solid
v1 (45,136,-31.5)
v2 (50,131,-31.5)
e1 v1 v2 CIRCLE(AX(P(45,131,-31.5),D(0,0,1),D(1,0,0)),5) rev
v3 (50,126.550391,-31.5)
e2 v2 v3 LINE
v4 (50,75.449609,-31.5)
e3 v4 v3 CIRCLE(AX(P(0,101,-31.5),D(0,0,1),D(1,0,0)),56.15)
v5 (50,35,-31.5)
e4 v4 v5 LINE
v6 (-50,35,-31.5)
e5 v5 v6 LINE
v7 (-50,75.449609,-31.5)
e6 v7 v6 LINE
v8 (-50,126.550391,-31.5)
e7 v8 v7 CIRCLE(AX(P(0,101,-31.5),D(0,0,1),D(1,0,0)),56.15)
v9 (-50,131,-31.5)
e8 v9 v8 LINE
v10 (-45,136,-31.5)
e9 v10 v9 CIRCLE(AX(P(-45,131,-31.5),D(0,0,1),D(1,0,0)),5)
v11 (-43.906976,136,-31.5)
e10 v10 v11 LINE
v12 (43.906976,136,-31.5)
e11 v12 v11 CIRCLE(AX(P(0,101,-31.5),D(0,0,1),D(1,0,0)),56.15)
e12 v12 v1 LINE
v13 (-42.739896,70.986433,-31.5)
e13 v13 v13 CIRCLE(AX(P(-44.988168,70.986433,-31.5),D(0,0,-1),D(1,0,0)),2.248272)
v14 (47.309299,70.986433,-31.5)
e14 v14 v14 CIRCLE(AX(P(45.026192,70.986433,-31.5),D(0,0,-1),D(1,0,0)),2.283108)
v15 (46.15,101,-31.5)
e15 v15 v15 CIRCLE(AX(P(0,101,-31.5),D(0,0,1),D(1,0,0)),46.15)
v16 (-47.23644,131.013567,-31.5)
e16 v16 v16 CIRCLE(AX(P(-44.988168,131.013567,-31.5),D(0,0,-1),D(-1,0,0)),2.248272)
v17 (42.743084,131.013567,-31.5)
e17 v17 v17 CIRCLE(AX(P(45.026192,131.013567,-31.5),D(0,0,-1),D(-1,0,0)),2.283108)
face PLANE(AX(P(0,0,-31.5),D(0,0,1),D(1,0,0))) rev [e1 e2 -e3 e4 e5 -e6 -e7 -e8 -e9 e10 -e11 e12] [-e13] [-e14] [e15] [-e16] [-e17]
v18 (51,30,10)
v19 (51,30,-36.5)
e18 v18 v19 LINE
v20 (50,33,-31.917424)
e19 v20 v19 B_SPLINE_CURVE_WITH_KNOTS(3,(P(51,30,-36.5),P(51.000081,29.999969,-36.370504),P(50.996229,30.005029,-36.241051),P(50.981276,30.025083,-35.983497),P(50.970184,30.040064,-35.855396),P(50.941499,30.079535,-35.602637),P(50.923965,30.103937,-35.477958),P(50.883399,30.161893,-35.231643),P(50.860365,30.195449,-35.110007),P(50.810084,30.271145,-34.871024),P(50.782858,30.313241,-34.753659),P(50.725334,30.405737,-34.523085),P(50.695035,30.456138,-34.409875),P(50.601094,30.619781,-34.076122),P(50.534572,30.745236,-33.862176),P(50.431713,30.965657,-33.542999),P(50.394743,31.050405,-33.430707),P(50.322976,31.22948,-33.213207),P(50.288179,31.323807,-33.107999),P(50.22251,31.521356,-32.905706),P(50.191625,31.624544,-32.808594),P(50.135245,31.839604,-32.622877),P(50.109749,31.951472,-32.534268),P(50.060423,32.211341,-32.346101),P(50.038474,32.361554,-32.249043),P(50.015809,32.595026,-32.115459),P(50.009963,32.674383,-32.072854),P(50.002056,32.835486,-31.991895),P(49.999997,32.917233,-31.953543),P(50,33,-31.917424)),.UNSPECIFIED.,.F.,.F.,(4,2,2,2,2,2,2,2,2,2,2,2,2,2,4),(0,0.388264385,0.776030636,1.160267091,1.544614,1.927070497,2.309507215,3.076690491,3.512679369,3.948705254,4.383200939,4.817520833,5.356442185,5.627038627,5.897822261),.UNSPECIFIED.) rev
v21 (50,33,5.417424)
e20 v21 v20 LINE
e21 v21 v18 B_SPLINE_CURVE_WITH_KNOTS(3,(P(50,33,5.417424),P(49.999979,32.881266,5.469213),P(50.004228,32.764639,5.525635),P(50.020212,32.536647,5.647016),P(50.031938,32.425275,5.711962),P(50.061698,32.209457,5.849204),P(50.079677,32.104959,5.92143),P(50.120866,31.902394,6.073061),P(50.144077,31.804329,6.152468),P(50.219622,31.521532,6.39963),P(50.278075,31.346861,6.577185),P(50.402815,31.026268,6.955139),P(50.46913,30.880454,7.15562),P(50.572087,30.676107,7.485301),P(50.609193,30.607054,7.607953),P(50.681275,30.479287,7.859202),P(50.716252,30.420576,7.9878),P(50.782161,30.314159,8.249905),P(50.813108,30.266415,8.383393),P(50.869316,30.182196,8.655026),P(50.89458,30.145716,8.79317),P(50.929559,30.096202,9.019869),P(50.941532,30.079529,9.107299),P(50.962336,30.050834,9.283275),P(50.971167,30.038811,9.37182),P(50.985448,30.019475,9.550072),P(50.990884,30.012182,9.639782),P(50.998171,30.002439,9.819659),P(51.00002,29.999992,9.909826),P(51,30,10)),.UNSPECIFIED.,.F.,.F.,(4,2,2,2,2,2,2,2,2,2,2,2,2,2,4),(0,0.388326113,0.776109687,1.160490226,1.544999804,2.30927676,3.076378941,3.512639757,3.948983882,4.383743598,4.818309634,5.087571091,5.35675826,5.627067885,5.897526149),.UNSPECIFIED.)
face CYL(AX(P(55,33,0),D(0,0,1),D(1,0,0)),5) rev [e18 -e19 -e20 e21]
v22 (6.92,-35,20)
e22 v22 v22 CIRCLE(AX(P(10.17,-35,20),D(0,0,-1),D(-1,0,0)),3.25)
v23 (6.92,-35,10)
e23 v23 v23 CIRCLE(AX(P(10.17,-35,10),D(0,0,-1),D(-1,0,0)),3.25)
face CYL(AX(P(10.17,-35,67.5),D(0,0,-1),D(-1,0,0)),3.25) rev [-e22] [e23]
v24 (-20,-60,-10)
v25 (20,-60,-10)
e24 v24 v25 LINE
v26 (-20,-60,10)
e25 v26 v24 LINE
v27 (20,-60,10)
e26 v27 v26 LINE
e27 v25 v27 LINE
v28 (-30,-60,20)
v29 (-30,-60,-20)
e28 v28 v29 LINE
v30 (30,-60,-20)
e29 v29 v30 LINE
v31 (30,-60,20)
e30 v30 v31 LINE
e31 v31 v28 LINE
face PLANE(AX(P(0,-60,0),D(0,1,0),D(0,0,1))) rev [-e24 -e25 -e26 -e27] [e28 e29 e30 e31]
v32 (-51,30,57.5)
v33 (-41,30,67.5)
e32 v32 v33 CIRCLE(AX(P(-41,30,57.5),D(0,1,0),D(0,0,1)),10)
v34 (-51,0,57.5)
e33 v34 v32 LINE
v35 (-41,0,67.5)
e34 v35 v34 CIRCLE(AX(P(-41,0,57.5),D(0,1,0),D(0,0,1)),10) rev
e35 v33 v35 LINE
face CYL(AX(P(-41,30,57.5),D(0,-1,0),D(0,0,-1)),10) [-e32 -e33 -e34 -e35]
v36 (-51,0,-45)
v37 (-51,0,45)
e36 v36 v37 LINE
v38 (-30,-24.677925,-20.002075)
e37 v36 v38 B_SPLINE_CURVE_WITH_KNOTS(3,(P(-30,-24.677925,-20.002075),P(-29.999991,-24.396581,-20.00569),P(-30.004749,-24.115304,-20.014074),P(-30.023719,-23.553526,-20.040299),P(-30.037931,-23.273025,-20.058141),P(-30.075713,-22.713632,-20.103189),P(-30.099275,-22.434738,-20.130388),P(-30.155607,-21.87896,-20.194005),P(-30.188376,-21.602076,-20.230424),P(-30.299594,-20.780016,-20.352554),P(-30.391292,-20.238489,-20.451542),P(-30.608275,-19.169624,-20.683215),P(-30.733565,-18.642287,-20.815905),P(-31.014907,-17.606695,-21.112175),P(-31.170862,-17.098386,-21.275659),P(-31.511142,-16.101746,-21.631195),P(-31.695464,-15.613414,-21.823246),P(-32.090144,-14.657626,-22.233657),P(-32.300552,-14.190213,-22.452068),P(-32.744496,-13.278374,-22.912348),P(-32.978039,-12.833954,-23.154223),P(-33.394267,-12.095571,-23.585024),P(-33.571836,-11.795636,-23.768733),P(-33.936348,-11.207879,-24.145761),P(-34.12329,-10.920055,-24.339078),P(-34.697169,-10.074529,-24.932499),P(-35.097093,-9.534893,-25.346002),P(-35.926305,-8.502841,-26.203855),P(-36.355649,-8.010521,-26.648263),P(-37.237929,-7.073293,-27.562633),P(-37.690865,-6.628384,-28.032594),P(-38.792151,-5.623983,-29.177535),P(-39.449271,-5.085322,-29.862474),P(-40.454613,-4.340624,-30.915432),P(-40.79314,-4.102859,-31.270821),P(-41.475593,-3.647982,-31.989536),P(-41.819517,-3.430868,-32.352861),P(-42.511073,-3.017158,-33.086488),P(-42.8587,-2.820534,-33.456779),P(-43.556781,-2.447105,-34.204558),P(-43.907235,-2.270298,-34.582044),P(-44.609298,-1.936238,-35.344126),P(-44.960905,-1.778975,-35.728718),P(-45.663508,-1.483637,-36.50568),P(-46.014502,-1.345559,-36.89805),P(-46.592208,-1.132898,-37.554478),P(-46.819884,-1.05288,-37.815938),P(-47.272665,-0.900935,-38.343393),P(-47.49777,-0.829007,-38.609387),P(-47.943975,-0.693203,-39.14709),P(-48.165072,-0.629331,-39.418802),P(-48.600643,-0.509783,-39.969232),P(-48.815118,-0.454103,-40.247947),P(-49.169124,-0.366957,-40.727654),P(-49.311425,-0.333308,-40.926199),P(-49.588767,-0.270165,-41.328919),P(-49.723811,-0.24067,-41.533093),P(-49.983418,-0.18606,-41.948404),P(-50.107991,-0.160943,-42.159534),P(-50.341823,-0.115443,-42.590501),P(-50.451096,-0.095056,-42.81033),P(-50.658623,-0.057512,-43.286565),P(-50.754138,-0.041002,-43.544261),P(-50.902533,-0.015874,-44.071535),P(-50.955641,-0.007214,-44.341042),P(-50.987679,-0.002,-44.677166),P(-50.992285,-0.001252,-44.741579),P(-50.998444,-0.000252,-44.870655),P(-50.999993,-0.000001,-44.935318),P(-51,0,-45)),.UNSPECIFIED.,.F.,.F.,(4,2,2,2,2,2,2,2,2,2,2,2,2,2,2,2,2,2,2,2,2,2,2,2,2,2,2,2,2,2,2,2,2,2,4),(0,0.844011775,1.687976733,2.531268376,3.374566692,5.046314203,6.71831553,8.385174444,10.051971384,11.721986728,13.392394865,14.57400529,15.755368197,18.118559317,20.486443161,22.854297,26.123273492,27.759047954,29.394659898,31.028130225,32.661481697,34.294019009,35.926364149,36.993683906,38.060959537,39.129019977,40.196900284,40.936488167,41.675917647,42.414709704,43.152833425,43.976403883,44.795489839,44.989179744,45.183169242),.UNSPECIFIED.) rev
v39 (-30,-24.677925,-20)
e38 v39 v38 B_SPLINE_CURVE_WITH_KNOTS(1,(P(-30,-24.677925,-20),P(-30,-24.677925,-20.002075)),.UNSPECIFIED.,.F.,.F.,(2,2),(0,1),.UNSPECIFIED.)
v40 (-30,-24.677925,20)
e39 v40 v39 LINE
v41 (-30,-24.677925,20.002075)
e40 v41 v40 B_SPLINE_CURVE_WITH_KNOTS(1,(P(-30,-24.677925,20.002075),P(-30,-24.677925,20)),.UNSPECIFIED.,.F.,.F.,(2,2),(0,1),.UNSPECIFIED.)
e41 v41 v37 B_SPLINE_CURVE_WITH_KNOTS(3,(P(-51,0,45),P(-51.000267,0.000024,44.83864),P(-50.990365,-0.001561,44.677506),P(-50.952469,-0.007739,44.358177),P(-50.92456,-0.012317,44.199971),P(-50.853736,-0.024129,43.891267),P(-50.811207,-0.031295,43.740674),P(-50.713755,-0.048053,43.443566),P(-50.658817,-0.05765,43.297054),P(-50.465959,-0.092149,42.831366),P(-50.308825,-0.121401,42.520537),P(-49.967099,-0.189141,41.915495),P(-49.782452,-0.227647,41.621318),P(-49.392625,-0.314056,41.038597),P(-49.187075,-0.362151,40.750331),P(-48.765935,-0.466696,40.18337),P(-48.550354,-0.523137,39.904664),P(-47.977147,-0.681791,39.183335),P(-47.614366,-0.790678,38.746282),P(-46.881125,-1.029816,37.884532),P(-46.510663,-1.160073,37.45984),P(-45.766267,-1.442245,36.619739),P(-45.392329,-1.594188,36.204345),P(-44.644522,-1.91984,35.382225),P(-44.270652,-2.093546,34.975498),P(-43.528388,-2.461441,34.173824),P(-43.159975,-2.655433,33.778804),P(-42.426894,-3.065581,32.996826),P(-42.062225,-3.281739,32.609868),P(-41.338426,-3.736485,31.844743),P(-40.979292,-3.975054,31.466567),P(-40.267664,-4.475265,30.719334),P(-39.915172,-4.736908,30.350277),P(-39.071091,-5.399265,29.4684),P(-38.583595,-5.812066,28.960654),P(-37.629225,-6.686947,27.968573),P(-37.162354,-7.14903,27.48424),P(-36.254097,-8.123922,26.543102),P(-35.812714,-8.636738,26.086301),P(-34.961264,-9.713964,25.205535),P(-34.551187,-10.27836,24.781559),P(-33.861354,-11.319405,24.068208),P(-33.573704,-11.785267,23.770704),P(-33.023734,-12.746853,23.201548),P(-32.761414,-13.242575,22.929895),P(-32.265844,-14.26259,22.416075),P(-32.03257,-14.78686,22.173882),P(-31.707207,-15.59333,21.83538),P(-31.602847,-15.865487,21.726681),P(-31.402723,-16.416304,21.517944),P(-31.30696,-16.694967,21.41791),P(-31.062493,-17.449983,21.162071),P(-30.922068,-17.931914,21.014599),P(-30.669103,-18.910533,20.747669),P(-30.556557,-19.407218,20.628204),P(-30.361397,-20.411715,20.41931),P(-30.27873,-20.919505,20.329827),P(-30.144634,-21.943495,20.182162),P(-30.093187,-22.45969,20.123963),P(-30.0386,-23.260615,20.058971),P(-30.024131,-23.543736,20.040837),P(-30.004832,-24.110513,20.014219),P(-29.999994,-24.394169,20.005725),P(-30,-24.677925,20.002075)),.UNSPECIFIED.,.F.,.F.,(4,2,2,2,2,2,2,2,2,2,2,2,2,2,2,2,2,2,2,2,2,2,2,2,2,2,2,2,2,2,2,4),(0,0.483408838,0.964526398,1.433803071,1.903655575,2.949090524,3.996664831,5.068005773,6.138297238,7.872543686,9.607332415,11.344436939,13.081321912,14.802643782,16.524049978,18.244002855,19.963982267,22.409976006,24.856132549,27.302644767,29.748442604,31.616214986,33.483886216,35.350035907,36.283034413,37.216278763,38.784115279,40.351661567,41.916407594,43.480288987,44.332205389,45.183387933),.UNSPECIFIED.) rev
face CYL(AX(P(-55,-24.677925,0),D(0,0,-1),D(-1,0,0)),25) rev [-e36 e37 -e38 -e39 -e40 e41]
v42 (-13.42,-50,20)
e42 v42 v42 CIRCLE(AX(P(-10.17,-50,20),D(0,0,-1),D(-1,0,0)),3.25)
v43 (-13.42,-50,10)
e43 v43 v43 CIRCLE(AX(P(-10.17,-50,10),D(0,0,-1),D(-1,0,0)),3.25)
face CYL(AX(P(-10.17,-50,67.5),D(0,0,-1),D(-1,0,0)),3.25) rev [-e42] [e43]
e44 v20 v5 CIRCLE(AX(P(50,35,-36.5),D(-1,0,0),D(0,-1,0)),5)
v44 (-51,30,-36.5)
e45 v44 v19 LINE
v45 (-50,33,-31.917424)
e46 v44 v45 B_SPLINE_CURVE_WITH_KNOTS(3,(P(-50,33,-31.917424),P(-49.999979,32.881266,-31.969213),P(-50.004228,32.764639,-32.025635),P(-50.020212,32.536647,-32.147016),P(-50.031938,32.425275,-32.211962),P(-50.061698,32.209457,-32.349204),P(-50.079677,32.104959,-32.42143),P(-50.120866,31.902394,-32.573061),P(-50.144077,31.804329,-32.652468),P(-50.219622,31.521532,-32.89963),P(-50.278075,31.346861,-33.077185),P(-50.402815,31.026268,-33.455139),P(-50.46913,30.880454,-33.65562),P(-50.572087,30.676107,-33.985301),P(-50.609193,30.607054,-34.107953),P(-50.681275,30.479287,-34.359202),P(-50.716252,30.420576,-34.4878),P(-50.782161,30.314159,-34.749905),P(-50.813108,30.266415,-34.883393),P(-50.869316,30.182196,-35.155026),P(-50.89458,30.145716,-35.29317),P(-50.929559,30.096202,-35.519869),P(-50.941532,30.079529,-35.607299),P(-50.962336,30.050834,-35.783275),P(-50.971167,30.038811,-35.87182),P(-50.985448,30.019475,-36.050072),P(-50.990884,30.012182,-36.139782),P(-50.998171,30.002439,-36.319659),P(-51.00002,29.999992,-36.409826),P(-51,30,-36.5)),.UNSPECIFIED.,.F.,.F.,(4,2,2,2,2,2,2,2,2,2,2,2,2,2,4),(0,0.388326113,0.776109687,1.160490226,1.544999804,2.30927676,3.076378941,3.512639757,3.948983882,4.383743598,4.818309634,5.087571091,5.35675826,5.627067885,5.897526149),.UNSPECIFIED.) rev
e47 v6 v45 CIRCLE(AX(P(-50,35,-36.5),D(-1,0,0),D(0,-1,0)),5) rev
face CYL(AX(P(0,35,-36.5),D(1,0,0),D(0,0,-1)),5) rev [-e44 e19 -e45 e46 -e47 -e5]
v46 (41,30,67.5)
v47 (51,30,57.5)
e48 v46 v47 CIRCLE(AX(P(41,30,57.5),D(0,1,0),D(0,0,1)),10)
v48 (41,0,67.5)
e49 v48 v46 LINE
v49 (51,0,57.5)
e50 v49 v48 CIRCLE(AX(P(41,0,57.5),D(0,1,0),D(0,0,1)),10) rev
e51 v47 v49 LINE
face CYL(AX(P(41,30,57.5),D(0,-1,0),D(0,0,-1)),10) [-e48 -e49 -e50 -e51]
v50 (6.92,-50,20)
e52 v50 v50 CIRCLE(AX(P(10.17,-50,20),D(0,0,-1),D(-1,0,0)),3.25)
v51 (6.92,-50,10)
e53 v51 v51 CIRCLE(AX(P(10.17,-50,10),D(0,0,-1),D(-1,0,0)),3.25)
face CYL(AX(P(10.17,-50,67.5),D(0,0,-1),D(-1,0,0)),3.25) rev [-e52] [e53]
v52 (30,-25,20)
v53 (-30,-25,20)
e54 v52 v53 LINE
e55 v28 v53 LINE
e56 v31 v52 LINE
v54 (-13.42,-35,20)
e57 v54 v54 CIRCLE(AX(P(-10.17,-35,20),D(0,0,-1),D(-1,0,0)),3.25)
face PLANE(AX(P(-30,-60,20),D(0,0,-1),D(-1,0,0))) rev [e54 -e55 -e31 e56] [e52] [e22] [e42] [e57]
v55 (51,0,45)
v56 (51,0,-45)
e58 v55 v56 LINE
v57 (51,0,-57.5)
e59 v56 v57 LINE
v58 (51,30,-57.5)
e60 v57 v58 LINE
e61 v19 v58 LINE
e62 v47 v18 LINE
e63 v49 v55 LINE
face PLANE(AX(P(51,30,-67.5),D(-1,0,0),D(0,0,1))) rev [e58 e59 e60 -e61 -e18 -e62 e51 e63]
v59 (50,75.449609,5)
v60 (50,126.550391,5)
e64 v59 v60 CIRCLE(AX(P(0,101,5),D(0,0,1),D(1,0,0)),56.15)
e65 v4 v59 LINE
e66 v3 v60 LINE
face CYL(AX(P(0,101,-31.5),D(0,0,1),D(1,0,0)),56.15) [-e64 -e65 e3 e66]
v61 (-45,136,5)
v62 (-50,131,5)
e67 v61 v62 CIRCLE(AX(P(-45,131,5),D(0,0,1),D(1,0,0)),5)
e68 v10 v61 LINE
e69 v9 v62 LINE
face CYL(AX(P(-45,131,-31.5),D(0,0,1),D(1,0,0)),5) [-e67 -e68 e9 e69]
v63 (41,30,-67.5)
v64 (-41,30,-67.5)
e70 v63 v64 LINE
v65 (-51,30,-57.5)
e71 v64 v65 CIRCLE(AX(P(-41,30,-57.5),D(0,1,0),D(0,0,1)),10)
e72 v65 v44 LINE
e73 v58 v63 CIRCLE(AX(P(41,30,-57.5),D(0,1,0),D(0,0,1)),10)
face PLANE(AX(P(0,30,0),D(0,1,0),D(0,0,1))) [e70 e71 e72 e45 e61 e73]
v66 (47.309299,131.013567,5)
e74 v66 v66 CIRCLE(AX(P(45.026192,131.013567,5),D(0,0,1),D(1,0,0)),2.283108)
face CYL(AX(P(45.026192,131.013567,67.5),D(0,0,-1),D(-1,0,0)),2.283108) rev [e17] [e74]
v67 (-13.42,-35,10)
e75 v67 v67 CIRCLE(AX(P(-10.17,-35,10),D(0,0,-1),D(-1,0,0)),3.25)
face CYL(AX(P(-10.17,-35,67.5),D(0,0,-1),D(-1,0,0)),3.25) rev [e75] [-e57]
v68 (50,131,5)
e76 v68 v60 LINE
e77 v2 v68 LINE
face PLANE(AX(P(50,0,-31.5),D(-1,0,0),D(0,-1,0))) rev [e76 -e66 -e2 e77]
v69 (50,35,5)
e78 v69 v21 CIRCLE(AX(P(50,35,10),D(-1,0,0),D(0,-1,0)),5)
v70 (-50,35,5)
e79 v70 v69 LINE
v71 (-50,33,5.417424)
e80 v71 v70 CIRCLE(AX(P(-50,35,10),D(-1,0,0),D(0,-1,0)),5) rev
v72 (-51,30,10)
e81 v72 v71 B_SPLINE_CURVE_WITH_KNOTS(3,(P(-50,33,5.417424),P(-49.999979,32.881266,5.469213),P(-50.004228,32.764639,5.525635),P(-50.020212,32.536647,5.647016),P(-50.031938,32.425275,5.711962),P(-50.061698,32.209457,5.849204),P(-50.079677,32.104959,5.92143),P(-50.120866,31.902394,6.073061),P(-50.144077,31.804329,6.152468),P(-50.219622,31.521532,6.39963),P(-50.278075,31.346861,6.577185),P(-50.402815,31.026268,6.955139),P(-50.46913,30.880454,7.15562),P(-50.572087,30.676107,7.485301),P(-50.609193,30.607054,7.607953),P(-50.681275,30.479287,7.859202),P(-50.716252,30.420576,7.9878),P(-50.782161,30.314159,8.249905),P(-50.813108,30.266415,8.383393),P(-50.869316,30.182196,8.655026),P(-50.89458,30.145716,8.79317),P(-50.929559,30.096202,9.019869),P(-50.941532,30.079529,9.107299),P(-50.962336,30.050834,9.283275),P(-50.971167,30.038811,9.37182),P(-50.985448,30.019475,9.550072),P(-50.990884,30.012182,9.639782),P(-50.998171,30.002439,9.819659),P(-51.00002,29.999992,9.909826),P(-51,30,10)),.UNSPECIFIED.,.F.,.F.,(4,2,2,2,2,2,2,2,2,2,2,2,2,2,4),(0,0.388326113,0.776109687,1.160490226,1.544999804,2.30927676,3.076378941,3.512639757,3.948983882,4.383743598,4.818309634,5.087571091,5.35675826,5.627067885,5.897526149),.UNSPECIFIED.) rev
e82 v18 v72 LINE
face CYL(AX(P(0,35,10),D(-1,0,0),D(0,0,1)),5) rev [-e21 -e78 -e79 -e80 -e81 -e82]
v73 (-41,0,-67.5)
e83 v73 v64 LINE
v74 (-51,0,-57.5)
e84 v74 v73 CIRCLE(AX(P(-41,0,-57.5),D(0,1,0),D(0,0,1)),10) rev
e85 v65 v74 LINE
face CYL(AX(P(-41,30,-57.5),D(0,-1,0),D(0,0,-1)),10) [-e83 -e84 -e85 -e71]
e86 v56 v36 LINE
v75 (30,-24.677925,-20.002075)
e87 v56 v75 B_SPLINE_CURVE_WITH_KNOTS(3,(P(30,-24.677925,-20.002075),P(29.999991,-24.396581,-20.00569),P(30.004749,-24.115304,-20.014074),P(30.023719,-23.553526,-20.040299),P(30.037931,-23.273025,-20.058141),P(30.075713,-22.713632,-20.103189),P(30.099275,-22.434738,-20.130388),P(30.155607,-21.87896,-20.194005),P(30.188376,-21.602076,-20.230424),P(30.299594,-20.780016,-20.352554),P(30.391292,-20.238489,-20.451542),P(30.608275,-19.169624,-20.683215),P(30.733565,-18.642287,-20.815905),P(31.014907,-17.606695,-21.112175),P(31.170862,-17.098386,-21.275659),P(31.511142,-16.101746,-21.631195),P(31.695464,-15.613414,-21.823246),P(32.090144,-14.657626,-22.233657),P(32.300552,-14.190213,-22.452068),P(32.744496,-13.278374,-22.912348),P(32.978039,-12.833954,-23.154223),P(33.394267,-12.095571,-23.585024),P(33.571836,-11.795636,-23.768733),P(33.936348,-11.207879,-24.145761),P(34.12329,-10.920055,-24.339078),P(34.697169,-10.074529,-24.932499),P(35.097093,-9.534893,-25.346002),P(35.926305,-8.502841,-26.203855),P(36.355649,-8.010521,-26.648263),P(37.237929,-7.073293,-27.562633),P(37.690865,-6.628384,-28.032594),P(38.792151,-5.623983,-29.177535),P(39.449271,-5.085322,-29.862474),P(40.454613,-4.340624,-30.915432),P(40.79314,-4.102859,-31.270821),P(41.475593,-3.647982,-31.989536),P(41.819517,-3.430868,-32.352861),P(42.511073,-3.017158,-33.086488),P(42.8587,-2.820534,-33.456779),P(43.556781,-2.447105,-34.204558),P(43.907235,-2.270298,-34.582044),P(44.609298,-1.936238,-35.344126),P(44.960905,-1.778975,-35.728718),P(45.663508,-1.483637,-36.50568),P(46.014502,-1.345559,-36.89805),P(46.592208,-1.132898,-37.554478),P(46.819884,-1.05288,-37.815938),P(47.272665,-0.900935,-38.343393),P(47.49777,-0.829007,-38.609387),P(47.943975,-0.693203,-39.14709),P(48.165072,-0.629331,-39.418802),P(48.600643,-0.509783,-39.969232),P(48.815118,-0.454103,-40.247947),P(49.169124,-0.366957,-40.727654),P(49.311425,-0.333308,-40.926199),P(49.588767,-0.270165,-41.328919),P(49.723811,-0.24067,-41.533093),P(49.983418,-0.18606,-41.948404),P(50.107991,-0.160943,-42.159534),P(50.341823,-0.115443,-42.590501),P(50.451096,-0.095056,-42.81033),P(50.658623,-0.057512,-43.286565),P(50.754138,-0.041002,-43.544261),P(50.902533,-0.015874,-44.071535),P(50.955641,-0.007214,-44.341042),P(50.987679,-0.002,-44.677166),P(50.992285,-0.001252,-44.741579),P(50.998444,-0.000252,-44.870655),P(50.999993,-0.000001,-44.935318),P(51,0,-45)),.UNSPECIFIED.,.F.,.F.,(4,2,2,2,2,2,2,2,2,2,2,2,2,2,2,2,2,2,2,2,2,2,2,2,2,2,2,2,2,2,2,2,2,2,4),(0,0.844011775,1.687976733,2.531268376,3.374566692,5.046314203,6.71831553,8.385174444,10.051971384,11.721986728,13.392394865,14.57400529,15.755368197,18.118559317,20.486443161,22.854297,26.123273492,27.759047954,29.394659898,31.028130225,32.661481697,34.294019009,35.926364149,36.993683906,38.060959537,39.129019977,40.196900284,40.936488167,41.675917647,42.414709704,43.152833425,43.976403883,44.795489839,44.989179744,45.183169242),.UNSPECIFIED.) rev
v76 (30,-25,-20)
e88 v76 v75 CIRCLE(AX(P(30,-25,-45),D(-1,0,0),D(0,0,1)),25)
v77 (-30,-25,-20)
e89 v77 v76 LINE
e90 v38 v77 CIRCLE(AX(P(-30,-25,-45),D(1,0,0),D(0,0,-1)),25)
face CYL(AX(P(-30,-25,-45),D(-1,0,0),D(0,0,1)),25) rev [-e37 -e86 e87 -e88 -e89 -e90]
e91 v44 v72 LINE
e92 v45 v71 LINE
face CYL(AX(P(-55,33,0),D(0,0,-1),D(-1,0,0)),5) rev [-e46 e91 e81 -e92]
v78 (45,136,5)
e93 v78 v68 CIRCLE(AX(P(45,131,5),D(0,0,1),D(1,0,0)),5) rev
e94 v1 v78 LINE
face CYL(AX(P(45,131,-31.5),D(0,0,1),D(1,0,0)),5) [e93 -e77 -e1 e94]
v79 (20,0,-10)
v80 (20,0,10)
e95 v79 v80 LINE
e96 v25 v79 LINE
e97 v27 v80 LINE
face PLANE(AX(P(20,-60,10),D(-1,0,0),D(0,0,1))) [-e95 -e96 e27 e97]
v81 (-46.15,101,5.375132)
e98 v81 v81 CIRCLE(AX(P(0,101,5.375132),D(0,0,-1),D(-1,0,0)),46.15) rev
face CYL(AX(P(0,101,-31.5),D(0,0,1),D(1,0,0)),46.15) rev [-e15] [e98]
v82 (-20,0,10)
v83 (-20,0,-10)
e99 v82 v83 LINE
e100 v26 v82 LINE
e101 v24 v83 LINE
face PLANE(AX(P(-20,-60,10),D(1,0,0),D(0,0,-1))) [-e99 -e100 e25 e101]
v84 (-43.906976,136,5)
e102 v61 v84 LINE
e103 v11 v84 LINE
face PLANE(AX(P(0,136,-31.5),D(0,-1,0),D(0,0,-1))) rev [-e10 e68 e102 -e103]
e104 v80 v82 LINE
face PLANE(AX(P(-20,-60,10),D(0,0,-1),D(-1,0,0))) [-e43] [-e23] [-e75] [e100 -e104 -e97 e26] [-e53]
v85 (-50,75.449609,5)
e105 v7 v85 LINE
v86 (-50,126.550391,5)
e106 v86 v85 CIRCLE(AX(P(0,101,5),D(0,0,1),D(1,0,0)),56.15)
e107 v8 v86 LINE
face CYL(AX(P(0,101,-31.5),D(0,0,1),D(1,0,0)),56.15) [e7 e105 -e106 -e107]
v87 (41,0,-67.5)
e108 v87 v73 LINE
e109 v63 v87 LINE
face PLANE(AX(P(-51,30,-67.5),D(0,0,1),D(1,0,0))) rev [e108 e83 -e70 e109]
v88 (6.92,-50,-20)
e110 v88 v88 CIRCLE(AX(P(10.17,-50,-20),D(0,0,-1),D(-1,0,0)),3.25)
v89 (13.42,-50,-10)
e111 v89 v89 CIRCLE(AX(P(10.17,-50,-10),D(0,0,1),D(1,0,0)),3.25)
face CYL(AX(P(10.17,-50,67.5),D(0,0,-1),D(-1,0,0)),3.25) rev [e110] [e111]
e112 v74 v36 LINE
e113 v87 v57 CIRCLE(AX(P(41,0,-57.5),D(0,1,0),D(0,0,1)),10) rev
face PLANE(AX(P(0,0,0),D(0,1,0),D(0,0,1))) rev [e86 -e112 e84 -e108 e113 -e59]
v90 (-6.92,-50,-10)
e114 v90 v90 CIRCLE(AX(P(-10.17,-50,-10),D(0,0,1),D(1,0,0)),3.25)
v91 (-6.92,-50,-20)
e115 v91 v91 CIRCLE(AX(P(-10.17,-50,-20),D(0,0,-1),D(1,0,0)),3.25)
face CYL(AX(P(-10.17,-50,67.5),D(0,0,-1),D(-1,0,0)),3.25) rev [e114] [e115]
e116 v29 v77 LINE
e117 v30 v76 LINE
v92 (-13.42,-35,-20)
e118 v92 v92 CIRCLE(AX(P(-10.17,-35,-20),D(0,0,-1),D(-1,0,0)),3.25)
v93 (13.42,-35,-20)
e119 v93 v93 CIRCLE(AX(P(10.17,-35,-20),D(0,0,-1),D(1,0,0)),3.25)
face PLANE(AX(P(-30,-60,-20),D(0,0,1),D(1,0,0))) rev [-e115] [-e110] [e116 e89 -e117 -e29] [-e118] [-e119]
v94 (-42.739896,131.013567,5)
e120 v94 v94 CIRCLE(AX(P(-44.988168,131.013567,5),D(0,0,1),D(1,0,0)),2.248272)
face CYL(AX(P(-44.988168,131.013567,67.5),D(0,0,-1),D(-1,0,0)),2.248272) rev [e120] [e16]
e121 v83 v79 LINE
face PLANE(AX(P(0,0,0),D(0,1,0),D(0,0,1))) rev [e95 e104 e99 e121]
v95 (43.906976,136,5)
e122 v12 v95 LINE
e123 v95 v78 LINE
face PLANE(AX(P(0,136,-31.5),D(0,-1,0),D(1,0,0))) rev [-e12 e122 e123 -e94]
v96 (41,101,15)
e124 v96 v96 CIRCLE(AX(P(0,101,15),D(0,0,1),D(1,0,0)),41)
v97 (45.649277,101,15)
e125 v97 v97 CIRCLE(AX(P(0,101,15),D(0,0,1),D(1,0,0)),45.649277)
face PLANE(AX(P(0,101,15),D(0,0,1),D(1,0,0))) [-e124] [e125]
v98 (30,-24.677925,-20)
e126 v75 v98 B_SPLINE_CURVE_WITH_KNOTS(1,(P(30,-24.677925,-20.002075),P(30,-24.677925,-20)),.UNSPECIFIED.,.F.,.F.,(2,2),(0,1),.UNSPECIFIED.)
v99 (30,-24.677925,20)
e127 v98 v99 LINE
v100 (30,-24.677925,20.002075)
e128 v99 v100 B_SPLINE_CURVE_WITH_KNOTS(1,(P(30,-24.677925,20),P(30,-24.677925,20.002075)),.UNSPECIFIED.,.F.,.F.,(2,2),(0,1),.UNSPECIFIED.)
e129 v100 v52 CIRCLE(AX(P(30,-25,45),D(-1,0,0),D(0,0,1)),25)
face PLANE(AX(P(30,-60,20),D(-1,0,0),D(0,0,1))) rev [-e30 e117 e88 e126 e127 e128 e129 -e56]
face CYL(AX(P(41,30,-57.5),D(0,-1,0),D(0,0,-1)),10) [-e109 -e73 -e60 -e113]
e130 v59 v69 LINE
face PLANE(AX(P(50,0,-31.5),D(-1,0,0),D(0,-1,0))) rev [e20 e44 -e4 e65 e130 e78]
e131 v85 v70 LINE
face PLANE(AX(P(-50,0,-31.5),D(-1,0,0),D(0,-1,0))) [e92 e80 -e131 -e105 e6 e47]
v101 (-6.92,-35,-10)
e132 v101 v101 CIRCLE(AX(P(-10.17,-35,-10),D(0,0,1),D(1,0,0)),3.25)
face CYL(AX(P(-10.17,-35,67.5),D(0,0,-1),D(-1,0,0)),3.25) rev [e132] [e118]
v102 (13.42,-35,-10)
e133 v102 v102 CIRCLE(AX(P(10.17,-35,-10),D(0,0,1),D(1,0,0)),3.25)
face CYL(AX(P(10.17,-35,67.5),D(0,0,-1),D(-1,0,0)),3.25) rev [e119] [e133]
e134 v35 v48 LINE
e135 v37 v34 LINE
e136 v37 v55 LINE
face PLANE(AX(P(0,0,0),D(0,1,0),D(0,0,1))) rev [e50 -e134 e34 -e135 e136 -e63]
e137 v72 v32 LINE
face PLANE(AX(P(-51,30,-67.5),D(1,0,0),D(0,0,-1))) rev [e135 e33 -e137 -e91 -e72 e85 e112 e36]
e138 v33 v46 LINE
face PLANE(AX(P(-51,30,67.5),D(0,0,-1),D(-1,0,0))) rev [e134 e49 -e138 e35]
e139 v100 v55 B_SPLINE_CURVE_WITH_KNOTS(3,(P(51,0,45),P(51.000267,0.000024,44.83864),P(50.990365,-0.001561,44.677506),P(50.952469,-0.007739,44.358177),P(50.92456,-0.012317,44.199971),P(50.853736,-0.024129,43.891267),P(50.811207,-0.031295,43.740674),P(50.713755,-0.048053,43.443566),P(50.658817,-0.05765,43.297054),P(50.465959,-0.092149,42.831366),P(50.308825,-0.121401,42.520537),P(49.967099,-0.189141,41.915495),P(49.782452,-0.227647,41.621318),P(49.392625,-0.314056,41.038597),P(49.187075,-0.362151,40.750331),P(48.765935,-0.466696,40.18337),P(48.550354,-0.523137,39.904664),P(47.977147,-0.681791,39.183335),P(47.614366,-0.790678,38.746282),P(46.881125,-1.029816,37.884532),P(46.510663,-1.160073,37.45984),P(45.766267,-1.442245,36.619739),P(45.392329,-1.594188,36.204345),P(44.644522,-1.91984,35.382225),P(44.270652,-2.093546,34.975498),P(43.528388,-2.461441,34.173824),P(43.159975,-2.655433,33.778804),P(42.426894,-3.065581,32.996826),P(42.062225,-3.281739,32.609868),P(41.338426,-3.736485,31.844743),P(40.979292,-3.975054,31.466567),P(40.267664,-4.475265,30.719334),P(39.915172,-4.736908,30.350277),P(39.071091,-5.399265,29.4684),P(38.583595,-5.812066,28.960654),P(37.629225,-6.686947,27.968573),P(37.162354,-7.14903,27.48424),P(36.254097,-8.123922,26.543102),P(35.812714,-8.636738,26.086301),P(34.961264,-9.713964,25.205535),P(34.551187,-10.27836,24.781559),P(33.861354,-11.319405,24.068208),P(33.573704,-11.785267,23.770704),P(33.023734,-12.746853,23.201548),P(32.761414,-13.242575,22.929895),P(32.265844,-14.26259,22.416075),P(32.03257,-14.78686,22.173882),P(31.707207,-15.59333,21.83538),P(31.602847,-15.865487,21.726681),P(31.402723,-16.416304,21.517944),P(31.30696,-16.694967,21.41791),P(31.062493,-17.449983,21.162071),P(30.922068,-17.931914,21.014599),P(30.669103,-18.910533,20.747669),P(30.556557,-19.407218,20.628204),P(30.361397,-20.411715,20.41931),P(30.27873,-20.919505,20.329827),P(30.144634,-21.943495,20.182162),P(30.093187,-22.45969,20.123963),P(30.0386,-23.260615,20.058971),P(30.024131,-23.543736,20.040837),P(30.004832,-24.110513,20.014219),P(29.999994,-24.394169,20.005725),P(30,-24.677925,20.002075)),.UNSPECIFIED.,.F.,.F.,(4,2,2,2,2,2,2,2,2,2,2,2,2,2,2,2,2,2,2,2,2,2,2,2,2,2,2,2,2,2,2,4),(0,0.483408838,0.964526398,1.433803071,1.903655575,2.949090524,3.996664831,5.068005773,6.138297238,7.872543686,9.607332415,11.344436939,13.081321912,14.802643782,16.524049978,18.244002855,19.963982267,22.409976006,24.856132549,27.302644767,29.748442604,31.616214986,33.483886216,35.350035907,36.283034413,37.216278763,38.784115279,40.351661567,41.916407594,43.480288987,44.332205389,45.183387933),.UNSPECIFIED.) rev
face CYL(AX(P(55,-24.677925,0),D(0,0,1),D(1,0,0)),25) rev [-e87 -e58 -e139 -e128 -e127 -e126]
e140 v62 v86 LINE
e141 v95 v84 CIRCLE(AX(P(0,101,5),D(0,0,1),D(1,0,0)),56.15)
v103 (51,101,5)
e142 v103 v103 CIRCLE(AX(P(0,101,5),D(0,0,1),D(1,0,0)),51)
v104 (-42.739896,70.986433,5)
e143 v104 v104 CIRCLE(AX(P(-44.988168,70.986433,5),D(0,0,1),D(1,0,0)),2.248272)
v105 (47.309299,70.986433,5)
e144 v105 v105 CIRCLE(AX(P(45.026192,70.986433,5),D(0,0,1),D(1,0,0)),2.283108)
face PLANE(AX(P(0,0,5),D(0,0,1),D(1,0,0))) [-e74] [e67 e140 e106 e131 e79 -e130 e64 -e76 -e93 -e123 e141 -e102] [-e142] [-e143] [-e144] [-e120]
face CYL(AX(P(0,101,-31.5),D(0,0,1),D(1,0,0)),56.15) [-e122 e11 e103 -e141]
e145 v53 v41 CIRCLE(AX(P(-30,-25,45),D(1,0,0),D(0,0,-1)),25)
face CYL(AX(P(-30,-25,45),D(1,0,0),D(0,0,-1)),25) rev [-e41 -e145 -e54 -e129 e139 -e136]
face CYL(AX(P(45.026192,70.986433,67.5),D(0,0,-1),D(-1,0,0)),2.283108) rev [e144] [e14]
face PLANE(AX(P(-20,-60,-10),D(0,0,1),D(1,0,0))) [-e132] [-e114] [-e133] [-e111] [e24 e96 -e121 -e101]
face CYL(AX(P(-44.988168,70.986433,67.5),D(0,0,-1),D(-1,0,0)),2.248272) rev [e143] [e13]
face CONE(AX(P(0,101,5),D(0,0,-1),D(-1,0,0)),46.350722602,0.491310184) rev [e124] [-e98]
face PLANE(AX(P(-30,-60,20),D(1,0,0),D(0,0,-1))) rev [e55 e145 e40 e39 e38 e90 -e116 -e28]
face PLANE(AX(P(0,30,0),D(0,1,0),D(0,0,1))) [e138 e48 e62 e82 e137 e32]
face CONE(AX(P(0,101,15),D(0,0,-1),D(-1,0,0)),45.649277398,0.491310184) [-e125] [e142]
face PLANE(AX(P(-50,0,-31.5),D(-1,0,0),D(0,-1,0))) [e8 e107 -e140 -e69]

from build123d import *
from OCP.BRepAlgoAPI import BRepAlgoAPI_Cut
from OCP.TopTools import TopTools_ListOfShape

# Parameters (mm, degrees)
CROQUIS1_W              = 102
CROQUIS1_H              = 135
SALIENTE_EXTRUIR1_DEPTH = 30
SALIENTE_EXTRUIR2_START = 5
CROQUIS3_R              = 46.15
SALIENTE_EXTRUIR2_DEPTH = 36.5
CROQUIS5_R              = 51
CROQUIS5_R_2            = 41
SALIENTE_EXTRUIR3_DEPTH = 10
CHAFL_N1_SIZE           = 5.350722602
CHAFL_N1_SIZE_2         = 10
CHAFL_N2_SIZE2          = 5.350722602
CHAFL_N2_SIZE           = 10
REDONDEO1_R             = 5
CROQUIS7_R              = 2.248271999
CROQUIS7_R_2            = 2.283107554
CORTAR_EXTRUIR2_DEPTH   = 195.035937393
REDONDEO2_R             = 10
CROQUIS8_W              = 60
CROQUIS8_H              = 40
CROQUIS8_W_2            = 40
CROQUIS8_H_2            = 20
SALIENTE_EXTRUIR4_DEPTH = 60
REDONDEO3_START         = -20
REDONDEO3_DEPTH         = 40
REDONDEO3_START_2       = -51.000005347
REDONDEO3_2_DEPTH       = 102.000005347
REDONDEO3_START_3       = -57.5
REDONDEO3_3_DEPTH       = 115
CROQUIS9_R              = 3.25
CORTAR_EXTRUIR3_DEPTH   = 189.428222408


with BuildPart() as part:
    # Croquis1 → Saliente-Extruir1 (new body)
    with BuildSketch(Plane(origin=(0, 0, 0), x_dir=(1, 0, 0), z_dir=(0, 1, 0))):
        Rectangle(CROQUIS1_W, CROQUIS1_H)
    extrude(amount=SALIENTE_EXTRUIR1_DEPTH)

    # Croquis3 → Saliente-Extruir2 (add)
    with BuildSketch(Plane.XY.offset(SALIENTE_EXTRUIR2_START)):
        with BuildLine():
            Line((45, 136), (43.906975528, 136))
            ThreePointArc((43.906975528, 136), (0, 157.15), (-43.906975528, 136))
            Line((-43.906975528, 136), (-45, 136))
            ThreePointArc((-45, 136), (-48.535533906, 134.535533906), (-50, 131))
            Line((-50, 131), (-50, 126.550391386))
            ThreePointArc((-50, 126.550391386), (-56.15, 101), (-50, 75.449608614))
            Line((-50, 75.449608614), (-50, 30))
            Line((-50, 30), (50, 30))
            Line((50, 30), (50, 75.449608614))
            ThreePointArc((50, 75.449608614), (56.15, 101), (50, 126.550391386))
            Line((50, 126.550391386), (50, 131))
            ThreePointArc((50, 131), (48.535533906, 134.535533906), (45, 136))
        make_face()
        with Locations((0, 101)):
            Circle(CROQUIS3_R, mode=Mode.SUBTRACT)
    extrude(amount=-SALIENTE_EXTRUIR2_DEPTH)

    # Croquis5 → Saliente-Extruir3 (add)
    with BuildSketch(Plane.XY.offset(5)):
        with Locations((0, 101)):
            Circle(CROQUIS5_R)
        with Locations((0, 101)):
            Circle(CROQUIS5_R_2, mode=Mode.SUBTRACT)
    extrude(amount=SALIENTE_EXTRUIR3_DEPTH)

    # Chaflán1
    # the kernel refuses this chamfer: 10, 5.350722602 mm, written as the material it takes off along each edge
    with BuildSketch(Plane(origin=(0, 101, 5), x_dir=(1, 0, 0), z_dir=(0, -1, 0))) as chafl_n1_piece_1_section:
        Polygon((41 + CHAFL_N1_SIZE, 0), (41, CHAFL_N1_SIZE_2), (41, 0), align=None)
    chafl_n1_piece_1 = revolve(axis=Axis((0, 101, 5), (0, 0, 1)), mode=Mode.PRIVATE)
    chafl_n1_piece_1 = chafl_n1_piece_1 & Plane(origin=(0, 101, 5), x_dir=(1, 0, 0), z_dir=(0, 0, 1)) * Cylinder(46.15, 186, mode=Mode.PRIVATE)
    add(chafl_n1_piece_1, mode=Mode.SUBTRACT)

    # Chaflán2
    chafl_n2_edges = [part.edges().sort_by_distance(p)[0] for p in [
        (-51, 101, 15),
    ]]
    chafl_n2_side = [part.faces().sort_by_distance(p)[0] for p in [
        (-51, 101, 14.892985548),
    ]]
    chamfer(chafl_n2_edges, length=CHAFL_N2_SIZE - 0.0001, length2=CHAFL_N2_SIZE2 - 0.0001, reference=chafl_n2_side[0])  # a hair under: the kernel refuses the full size

    # Redondeo1
    # the kernel refuses this fillet: 5 mm, written as the material it adds along each edge
    with BuildSketch(Plane(origin=(-50, 30, -31.5), x_dir=(0, 0, -1), z_dir=(1, 0, 0)), Plane(origin=(-50, 30, 5), x_dir=(0, 1, 0), z_dir=(1, 0, 0))) as redondeo1_piece_1:
        with BuildLine():
            CenterArc((REDONDEO1_R, REDONDEO1_R), REDONDEO1_R, 180, 90)
            Line((0, REDONDEO1_R), (-REDONDEO1_R * 0.02, REDONDEO1_R))
            Line((-REDONDEO1_R * 0.02, REDONDEO1_R), (-REDONDEO1_R * 0.02, -REDONDEO1_R * 0.02))
            Line((-REDONDEO1_R * 0.02, -REDONDEO1_R * 0.02), (REDONDEO1_R, -REDONDEO1_R * 0.02))
            Line((REDONDEO1_R, -REDONDEO1_R * 0.02), (REDONDEO1_R, 0))
        make_face()
    extrude(amount=100)
    with BuildSketch(Plane(origin=(50, 30, 5), x_dir=(0, 1, 0), z_dir=(0, 0, -1))) as redondeo1_piece_2:
        with BuildLine():
            CenterArc((3, 5), REDONDEO1_R, 233.130102354, 36.869897646)
            Line((0, 1), (-0.06, 0.92))
            ThreePointArc((-0.06, 0.92), (-0.1, 0.5), (-0.1, 0))
            Line((-0.1, 0), (0, -0.1))
            Line((0, -0.1), (3, -0.1))
            Line((3, -0.1), (3, 0))
        make_face()
    extrude(amount=36.5)
    with BuildSketch(Plane(origin=(-50, 30, 5), x_dir=(-1, 0, 0), z_dir=(0, 0, -1))) as redondeo1_piece_3:
        with BuildLine():
            CenterArc((5, 3), REDONDEO1_R, 180, 36.869897646)
            Line((0, 3), (-0.1, 3))
            Line((-0.1, 3), (-0.1, 0))
            Line((-0.1, 0), (0, -0.1))
            ThreePointArc((0, -0.1), (0.5, -0.1), (0.92, -0.06))
            Line((0.92, -0.06), (1, 0))
        make_face()
    extrude(amount=36.5)
    with BuildSketch(Plane(origin=(-50, 30, 5), x_dir=(-1, 0, 0), z_dir=(0, 0, -1))) as redondeo1_piece_4a_section:
        with BuildLine():
            CenterArc((5, 3), REDONDEO1_R, 180, 36.869897646)
            Line((0, 3), (-0.1, 3))
            Line((-0.1, 3), (-0.1, 0))
            Line((-0.1, 0), (0, -0.1))
            ThreePointArc((0, -0.1), (0.5, -0.1), (0.92, -0.06))
            Line((0.92, -0.06), (1, 0))
        make_face()
    redondeo1_piece_4a = extrude(amount=44, mode=Mode.PRIVATE)
    redondeo1_piece_4a = split(redondeo1_piece_4a, bisect_by=Plane(origin=(-50, 30, -31.5), z_dir=(0, 0, -1)), keep=Keep.TOP, mode=Mode.PRIVATE)
    with BuildSketch(Plane(origin=(-62.5, 30, -31.5), x_dir=(0, 0, -1), z_dir=(1, 0, 0))) as redondeo1_piece_4b_section:
        with BuildLine():
            CenterArc((REDONDEO1_R, REDONDEO1_R), REDONDEO1_R, 180, 90)
            Line((0, REDONDEO1_R), (-REDONDEO1_R * 0.02, REDONDEO1_R))
            Line((-REDONDEO1_R * 0.02, REDONDEO1_R), (-REDONDEO1_R * 0.02, -REDONDEO1_R * 0.02))
            Line((-REDONDEO1_R * 0.02, -REDONDEO1_R * 0.02), (REDONDEO1_R, -REDONDEO1_R * 0.02))
            Line((REDONDEO1_R, -REDONDEO1_R * 0.02), (REDONDEO1_R, 0))
        make_face()
    redondeo1_piece_4b = extrude(amount=112.5, mode=Mode.PRIVATE)
    redondeo1_piece_4b = split(redondeo1_piece_4b, bisect_by=Plane(origin=(-51, 30, -31.5), z_dir=(1, 0, 0)), keep=Keep.TOP, mode=Mode.PRIVATE)
    redondeo1_piece_4b = split(redondeo1_piece_4b, bisect_by=Plane(origin=(-50, 30, -31.5), z_dir=(-1, 0, 0)), keep=Keep.TOP, mode=Mode.PRIVATE)
    redondeo1_piece_4 = redondeo1_piece_4a & redondeo1_piece_4b
    add(redondeo1_piece_4)
    with BuildSketch(Plane(origin=(50, 30, 5), x_dir=(0, 1, 0), z_dir=(0, 0, -1))) as redondeo1_piece_5a_section:
        with BuildLine():
            CenterArc((3, 5), REDONDEO1_R, 233.130102354, 36.869897646)
            Line((0, 1), (-0.06, 0.92))
            ThreePointArc((-0.06, 0.92), (-0.1, 0.5), (-0.1, 0))
            Line((-0.1, 0), (0, -0.1))
            Line((0, -0.1), (3, -0.1))
            Line((3, -0.1), (3, 0))
        make_face()
    redondeo1_piece_5a = extrude(amount=44, mode=Mode.PRIVATE)
    redondeo1_piece_5a = split(redondeo1_piece_5a, bisect_by=Plane(origin=(50, 30, -31.5), z_dir=(0, 0, -1)), keep=Keep.TOP, mode=Mode.PRIVATE)
    with BuildSketch(Plane(origin=(-50, 30, -31.5), x_dir=(0, 0, -1), z_dir=(1, 0, 0))) as redondeo1_piece_5b_section:
        with BuildLine():
            CenterArc((REDONDEO1_R, REDONDEO1_R), REDONDEO1_R, 180, 90)
            Line((0, REDONDEO1_R), (-REDONDEO1_R * 0.02, REDONDEO1_R))
            Line((-REDONDEO1_R * 0.02, REDONDEO1_R), (-REDONDEO1_R * 0.02, -REDONDEO1_R * 0.02))
            Line((-REDONDEO1_R * 0.02, -REDONDEO1_R * 0.02), (REDONDEO1_R, -REDONDEO1_R * 0.02))
            Line((REDONDEO1_R, -REDONDEO1_R * 0.02), (REDONDEO1_R, 0))
        make_face()
    redondeo1_piece_5b = extrude(amount=112.5, mode=Mode.PRIVATE)
    redondeo1_piece_5b = split(redondeo1_piece_5b, bisect_by=Plane(origin=(50, 30, -31.5), z_dir=(1, 0, 0)), keep=Keep.TOP, mode=Mode.PRIVATE)
    redondeo1_piece_5b = split(redondeo1_piece_5b, bisect_by=Plane(origin=(51, 30, -31.5), z_dir=(-1, 0, 0)), keep=Keep.TOP, mode=Mode.PRIVATE)
    redondeo1_piece_5 = redondeo1_piece_5a & redondeo1_piece_5b
    add(redondeo1_piece_5)
    with BuildSketch(Plane(origin=(-50, 30, 5), x_dir=(0, 1, 0), z_dir=(1, 0, 0))) as redondeo1_piece_6a_section:
        with BuildLine():
            CenterArc((REDONDEO1_R, REDONDEO1_R), REDONDEO1_R, 180, 90)
            Line((0, REDONDEO1_R), (-REDONDEO1_R * 0.02, REDONDEO1_R))
            Line((-REDONDEO1_R * 0.02, REDONDEO1_R), (-REDONDEO1_R * 0.02, -REDONDEO1_R * 0.02))
            Line((-REDONDEO1_R * 0.02, -REDONDEO1_R * 0.02), (REDONDEO1_R, -REDONDEO1_R * 0.02))
            Line((REDONDEO1_R, -REDONDEO1_R * 0.02), (REDONDEO1_R, 0))
        make_face()
    redondeo1_piece_6a = extrude(amount=112.5, mode=Mode.PRIVATE)
    redondeo1_piece_6a = split(redondeo1_piece_6a, bisect_by=Plane(origin=(50, 30, 5), z_dir=(1, 0, 0)), keep=Keep.TOP, mode=Mode.PRIVATE)
    redondeo1_piece_6a = split(redondeo1_piece_6a, bisect_by=Plane(origin=(51, 30, 5), z_dir=(-1, 0, 0)), keep=Keep.TOP, mode=Mode.PRIVATE)
    with BuildSketch(Plane(origin=(50, 30, 12.5), x_dir=(0, 1, 0), z_dir=(0, 0, -1))) as redondeo1_piece_6b_section:
        with BuildLine():
            CenterArc((3, 5), REDONDEO1_R, 233.130102354, 36.869897646)
            Line((0, 1), (-0.06, 0.92))
            ThreePointArc((-0.06, 0.92), (-0.1, 0.5), (-0.1, 0))
            Line((-0.1, 0), (0, -0.1))
            Line((0, -0.1), (3, -0.1))
            Line((3, -0.1), (3, 0))
        make_face()
    redondeo1_piece_6b = extrude(amount=44, mode=Mode.PRIVATE)
    redondeo1_piece_6b = split(redondeo1_piece_6b, bisect_by=Plane(origin=(50, 30, 5), z_dir=(0, 0, 1)), keep=Keep.TOP, mode=Mode.PRIVATE)
    redondeo1_piece_6 = redondeo1_piece_6a & redondeo1_piece_6b
    add(redondeo1_piece_6)
    with BuildSketch(Plane(origin=(-62.5, 30, 5), x_dir=(0, 1, 0), z_dir=(1, 0, 0))) as redondeo1_piece_7a_section:
        with BuildLine():
            CenterArc((REDONDEO1_R, REDONDEO1_R), REDONDEO1_R, 180, 90)
            Line((0, REDONDEO1_R), (-REDONDEO1_R * 0.02, REDONDEO1_R))
            Line((-REDONDEO1_R * 0.02, REDONDEO1_R), (-REDONDEO1_R * 0.02, -REDONDEO1_R * 0.02))
            Line((-REDONDEO1_R * 0.02, -REDONDEO1_R * 0.02), (REDONDEO1_R, -REDONDEO1_R * 0.02))
            Line((REDONDEO1_R, -REDONDEO1_R * 0.02), (REDONDEO1_R, 0))
        make_face()
    redondeo1_piece_7a = extrude(amount=112.5, mode=Mode.PRIVATE)
    redondeo1_piece_7a = split(redondeo1_piece_7a, bisect_by=Plane(origin=(-50, 30, 5), z_dir=(-1, 0, 0)), keep=Keep.TOP, mode=Mode.PRIVATE)
    redondeo1_piece_7a = split(redondeo1_piece_7a, bisect_by=Plane(origin=(-51, 30, 5), z_dir=(1, 0, 0)), keep=Keep.TOP, mode=Mode.PRIVATE)
    with BuildSketch(Plane(origin=(-50, 30, 12.5), x_dir=(-1, 0, 0), z_dir=(0, 0, -1))) as redondeo1_piece_7b_section:
        with BuildLine():
            CenterArc((5, 3), REDONDEO1_R, 180, 36.869897646)
            Line((0, 3), (-0.1, 3))
            Line((-0.1, 3), (-0.1, 0))
            Line((-0.1, 0), (0, -0.1))
            ThreePointArc((0, -0.1), (0.5, -0.1), (0.92, -0.06))
            Line((0.92, -0.06), (1, 0))
        make_face()
    redondeo1_piece_7b = extrude(amount=44, mode=Mode.PRIVATE)
    redondeo1_piece_7b = split(redondeo1_piece_7b, bisect_by=Plane(origin=(-50, 30, 5), z_dir=(0, 0, 1)), keep=Keep.TOP, mode=Mode.PRIVATE)
    redondeo1_piece_7 = redondeo1_piece_7a & redondeo1_piece_7b
    add(redondeo1_piece_7)

    # Croquis7 → Cortar-Extruir2 (cut, through all)
    with BuildSketch(Plane(origin=(0, 0, -31.5), x_dir=(-1, 0, 0), z_dir=(0, 0, -1))):
        with Locations((44.988168305, 131.013566522)):
            Circle(CROQUIS7_R)
        with Locations((-45.026191842, 131.013566522)):
            Circle(CROQUIS7_R_2)
        with Locations(Location((-45.026191842, 70.986433478, 0), (0, 0, 180))):
            Circle(CROQUIS7_R_2)
        with Locations(Location((44.988168305, 70.986433478, 0), (0, 0, 180))):
            Circle(CROQUIS7_R)
    extrude(amount=-CORTAR_EXTRUIR2_DEPTH, mode=Mode.SUBTRACT)

    # Redondeo2
    redondeo2_edges = [part.edges().sort_by_distance(p)[0] for p in [
        (51, 15, 67.5),
        (-51, 15, 67.5),
        (-51, 15, -67.5),
        (51, 15, -67.5),
    ]]
    fillet(redondeo2_edges, radius=REDONDEO2_R)

    # Croquis8 → Saliente-Extruir4 (add)
    with BuildSketch(Plane.XZ):
        Rectangle(CROQUIS8_W, CROQUIS8_H)
        Rectangle(CROQUIS8_W_2, CROQUIS8_H_2, mode=Mode.SUBTRACT)
    extrude(amount=SALIENTE_EXTRUIR4_DEPTH)


with BuildPart() as redondeo3_tool:
    # Redondeo3: read off the stored shape, not the designer's step
    # Redondeo3 outline → Redondeo3 (new body)
    with BuildSketch(Plane.XY.offset(REDONDEO3_START)):
        with BuildLine():
            Line((-30, -24.677925359), (-30, 0))
            Line((-30, 0), (-51, 0))
            ThreePointArc((-51, 0), (-35.960567235, -8.476073612), (-30, -24.677925359))
        make_face()
        with BuildLine():
            ThreePointArc((30, -24.677925359), (35.960567235, -8.476073612), (51, 0))
            Line((51, 0), (30, 0))
            Line((30, 0), (30, -24.677925359))
        make_face()
    extrude(amount=REDONDEO3_DEPTH)


with BuildPart() as part_1:
    add(part.part)


with BuildPart() as part_2:
    # Redondeo3: joined with redondeo3_tool
    add(part_1.part.fuse(redondeo3_tool.part, tol=0.00001))


with BuildPart() as redondeo3_2_tool:
    # Redondeo3 2 outline → Redondeo3 2 (new body)
    with BuildSketch(Plane.YZ.offset(REDONDEO3_START_2)):
        with BuildLine():
            ThreePointArc((0, 45), (-7.32233047, 27.32233047), (-25, 20))
            Line((-25, 20), (0, 20))
            Line((0, 20), (0, 45))
        make_face()
        with BuildLine():
            Line((0, -20), (-25, -20))
            ThreePointArc((-25, -20), (-7.32233047, -27.32233047), (0, -45))
            Line((0, -45), (0, -20))
        make_face()
    extrude(amount=REDONDEO3_2_DEPTH)


with BuildPart() as part_3:
    add(part_2.part)


with BuildPart() as part_4:
    # Redondeo3 2: joined with redondeo3_2_tool
    add(part_3.part.fuse(redondeo3_2_tool.part, tol=0.00001))


with BuildPart() as redondeo3_3_tool:
    # Redondeo3 3 outline → Redondeo3 3 (new body)
    with BuildSketch(Plane.XY.offset(REDONDEO3_START_3)):
        with BuildLine():
            ThreePointArc((-30, -24.677925359), (-35.960567235, -8.476073612), (-51, 0))
            Line((-51, 0), (-51.000005347, -25))
            Line((-51.000005347, -25), (-30, -25))
            Line((-30, -25), (-30, -24.677925359))
        make_face()
        with BuildLine():
            Line((51, -25), (51, 0))
            ThreePointArc((51, 0), (35.960567235, -8.476073612), (30, -24.677925359))
            Line((30, -24.677925359), (30, -25))
            Line((30, -25), (51, -25))
        make_face()
    extrude(amount=REDONDEO3_3_DEPTH)


with BuildPart() as part_5:
    add(part_4.part)

    # Redondeo3 3: cut by redondeo3_3_tool, with a tolerance
    redondeo3_3_stock = TopTools_ListOfShape()
    redondeo3_3_stock.Append(part_5.part.wrapped)
    redondeo3_3_tools = TopTools_ListOfShape()
    redondeo3_3_tools.Append(redondeo3_3_tool.part.wrapped)
    redondeo3_3_cut = BRepAlgoAPI_Cut()
    redondeo3_3_cut.SetArguments(redondeo3_3_stock)
    redondeo3_3_cut.SetTools(redondeo3_3_tools)
    redondeo3_3_cut.SetFuzzyValue(0.00001)
    redondeo3_3_cut.Build()
    add(Compound.cast(redondeo3_3_cut.Shape()).solids(), mode=Mode.REPLACE)

    # Croquis9 → Cortar-Extruir3 (cut, through all)
    with BuildSketch(Plane(origin=(0, 0, -20), x_dir=(-1, 0, 0), z_dir=(0, 0, -1))):
        with Locations((-10.17, -50)):
            Circle(CROQUIS9_R)
        with Locations(Location((10.17, -50, 0), (0, 0, 180))):
            Circle(CROQUIS9_R)
        with Locations((10.17, -35)):
            Circle(CROQUIS9_R)
        with Locations(Location((-10.17, -35, 0), (0, 0, 180))):
            Circle(CROQUIS9_R)
    extrude(amount=-CORTAR_EXTRUIR3_DEPTH, mode=Mode.SUBTRACT)


solid = part_5.part
